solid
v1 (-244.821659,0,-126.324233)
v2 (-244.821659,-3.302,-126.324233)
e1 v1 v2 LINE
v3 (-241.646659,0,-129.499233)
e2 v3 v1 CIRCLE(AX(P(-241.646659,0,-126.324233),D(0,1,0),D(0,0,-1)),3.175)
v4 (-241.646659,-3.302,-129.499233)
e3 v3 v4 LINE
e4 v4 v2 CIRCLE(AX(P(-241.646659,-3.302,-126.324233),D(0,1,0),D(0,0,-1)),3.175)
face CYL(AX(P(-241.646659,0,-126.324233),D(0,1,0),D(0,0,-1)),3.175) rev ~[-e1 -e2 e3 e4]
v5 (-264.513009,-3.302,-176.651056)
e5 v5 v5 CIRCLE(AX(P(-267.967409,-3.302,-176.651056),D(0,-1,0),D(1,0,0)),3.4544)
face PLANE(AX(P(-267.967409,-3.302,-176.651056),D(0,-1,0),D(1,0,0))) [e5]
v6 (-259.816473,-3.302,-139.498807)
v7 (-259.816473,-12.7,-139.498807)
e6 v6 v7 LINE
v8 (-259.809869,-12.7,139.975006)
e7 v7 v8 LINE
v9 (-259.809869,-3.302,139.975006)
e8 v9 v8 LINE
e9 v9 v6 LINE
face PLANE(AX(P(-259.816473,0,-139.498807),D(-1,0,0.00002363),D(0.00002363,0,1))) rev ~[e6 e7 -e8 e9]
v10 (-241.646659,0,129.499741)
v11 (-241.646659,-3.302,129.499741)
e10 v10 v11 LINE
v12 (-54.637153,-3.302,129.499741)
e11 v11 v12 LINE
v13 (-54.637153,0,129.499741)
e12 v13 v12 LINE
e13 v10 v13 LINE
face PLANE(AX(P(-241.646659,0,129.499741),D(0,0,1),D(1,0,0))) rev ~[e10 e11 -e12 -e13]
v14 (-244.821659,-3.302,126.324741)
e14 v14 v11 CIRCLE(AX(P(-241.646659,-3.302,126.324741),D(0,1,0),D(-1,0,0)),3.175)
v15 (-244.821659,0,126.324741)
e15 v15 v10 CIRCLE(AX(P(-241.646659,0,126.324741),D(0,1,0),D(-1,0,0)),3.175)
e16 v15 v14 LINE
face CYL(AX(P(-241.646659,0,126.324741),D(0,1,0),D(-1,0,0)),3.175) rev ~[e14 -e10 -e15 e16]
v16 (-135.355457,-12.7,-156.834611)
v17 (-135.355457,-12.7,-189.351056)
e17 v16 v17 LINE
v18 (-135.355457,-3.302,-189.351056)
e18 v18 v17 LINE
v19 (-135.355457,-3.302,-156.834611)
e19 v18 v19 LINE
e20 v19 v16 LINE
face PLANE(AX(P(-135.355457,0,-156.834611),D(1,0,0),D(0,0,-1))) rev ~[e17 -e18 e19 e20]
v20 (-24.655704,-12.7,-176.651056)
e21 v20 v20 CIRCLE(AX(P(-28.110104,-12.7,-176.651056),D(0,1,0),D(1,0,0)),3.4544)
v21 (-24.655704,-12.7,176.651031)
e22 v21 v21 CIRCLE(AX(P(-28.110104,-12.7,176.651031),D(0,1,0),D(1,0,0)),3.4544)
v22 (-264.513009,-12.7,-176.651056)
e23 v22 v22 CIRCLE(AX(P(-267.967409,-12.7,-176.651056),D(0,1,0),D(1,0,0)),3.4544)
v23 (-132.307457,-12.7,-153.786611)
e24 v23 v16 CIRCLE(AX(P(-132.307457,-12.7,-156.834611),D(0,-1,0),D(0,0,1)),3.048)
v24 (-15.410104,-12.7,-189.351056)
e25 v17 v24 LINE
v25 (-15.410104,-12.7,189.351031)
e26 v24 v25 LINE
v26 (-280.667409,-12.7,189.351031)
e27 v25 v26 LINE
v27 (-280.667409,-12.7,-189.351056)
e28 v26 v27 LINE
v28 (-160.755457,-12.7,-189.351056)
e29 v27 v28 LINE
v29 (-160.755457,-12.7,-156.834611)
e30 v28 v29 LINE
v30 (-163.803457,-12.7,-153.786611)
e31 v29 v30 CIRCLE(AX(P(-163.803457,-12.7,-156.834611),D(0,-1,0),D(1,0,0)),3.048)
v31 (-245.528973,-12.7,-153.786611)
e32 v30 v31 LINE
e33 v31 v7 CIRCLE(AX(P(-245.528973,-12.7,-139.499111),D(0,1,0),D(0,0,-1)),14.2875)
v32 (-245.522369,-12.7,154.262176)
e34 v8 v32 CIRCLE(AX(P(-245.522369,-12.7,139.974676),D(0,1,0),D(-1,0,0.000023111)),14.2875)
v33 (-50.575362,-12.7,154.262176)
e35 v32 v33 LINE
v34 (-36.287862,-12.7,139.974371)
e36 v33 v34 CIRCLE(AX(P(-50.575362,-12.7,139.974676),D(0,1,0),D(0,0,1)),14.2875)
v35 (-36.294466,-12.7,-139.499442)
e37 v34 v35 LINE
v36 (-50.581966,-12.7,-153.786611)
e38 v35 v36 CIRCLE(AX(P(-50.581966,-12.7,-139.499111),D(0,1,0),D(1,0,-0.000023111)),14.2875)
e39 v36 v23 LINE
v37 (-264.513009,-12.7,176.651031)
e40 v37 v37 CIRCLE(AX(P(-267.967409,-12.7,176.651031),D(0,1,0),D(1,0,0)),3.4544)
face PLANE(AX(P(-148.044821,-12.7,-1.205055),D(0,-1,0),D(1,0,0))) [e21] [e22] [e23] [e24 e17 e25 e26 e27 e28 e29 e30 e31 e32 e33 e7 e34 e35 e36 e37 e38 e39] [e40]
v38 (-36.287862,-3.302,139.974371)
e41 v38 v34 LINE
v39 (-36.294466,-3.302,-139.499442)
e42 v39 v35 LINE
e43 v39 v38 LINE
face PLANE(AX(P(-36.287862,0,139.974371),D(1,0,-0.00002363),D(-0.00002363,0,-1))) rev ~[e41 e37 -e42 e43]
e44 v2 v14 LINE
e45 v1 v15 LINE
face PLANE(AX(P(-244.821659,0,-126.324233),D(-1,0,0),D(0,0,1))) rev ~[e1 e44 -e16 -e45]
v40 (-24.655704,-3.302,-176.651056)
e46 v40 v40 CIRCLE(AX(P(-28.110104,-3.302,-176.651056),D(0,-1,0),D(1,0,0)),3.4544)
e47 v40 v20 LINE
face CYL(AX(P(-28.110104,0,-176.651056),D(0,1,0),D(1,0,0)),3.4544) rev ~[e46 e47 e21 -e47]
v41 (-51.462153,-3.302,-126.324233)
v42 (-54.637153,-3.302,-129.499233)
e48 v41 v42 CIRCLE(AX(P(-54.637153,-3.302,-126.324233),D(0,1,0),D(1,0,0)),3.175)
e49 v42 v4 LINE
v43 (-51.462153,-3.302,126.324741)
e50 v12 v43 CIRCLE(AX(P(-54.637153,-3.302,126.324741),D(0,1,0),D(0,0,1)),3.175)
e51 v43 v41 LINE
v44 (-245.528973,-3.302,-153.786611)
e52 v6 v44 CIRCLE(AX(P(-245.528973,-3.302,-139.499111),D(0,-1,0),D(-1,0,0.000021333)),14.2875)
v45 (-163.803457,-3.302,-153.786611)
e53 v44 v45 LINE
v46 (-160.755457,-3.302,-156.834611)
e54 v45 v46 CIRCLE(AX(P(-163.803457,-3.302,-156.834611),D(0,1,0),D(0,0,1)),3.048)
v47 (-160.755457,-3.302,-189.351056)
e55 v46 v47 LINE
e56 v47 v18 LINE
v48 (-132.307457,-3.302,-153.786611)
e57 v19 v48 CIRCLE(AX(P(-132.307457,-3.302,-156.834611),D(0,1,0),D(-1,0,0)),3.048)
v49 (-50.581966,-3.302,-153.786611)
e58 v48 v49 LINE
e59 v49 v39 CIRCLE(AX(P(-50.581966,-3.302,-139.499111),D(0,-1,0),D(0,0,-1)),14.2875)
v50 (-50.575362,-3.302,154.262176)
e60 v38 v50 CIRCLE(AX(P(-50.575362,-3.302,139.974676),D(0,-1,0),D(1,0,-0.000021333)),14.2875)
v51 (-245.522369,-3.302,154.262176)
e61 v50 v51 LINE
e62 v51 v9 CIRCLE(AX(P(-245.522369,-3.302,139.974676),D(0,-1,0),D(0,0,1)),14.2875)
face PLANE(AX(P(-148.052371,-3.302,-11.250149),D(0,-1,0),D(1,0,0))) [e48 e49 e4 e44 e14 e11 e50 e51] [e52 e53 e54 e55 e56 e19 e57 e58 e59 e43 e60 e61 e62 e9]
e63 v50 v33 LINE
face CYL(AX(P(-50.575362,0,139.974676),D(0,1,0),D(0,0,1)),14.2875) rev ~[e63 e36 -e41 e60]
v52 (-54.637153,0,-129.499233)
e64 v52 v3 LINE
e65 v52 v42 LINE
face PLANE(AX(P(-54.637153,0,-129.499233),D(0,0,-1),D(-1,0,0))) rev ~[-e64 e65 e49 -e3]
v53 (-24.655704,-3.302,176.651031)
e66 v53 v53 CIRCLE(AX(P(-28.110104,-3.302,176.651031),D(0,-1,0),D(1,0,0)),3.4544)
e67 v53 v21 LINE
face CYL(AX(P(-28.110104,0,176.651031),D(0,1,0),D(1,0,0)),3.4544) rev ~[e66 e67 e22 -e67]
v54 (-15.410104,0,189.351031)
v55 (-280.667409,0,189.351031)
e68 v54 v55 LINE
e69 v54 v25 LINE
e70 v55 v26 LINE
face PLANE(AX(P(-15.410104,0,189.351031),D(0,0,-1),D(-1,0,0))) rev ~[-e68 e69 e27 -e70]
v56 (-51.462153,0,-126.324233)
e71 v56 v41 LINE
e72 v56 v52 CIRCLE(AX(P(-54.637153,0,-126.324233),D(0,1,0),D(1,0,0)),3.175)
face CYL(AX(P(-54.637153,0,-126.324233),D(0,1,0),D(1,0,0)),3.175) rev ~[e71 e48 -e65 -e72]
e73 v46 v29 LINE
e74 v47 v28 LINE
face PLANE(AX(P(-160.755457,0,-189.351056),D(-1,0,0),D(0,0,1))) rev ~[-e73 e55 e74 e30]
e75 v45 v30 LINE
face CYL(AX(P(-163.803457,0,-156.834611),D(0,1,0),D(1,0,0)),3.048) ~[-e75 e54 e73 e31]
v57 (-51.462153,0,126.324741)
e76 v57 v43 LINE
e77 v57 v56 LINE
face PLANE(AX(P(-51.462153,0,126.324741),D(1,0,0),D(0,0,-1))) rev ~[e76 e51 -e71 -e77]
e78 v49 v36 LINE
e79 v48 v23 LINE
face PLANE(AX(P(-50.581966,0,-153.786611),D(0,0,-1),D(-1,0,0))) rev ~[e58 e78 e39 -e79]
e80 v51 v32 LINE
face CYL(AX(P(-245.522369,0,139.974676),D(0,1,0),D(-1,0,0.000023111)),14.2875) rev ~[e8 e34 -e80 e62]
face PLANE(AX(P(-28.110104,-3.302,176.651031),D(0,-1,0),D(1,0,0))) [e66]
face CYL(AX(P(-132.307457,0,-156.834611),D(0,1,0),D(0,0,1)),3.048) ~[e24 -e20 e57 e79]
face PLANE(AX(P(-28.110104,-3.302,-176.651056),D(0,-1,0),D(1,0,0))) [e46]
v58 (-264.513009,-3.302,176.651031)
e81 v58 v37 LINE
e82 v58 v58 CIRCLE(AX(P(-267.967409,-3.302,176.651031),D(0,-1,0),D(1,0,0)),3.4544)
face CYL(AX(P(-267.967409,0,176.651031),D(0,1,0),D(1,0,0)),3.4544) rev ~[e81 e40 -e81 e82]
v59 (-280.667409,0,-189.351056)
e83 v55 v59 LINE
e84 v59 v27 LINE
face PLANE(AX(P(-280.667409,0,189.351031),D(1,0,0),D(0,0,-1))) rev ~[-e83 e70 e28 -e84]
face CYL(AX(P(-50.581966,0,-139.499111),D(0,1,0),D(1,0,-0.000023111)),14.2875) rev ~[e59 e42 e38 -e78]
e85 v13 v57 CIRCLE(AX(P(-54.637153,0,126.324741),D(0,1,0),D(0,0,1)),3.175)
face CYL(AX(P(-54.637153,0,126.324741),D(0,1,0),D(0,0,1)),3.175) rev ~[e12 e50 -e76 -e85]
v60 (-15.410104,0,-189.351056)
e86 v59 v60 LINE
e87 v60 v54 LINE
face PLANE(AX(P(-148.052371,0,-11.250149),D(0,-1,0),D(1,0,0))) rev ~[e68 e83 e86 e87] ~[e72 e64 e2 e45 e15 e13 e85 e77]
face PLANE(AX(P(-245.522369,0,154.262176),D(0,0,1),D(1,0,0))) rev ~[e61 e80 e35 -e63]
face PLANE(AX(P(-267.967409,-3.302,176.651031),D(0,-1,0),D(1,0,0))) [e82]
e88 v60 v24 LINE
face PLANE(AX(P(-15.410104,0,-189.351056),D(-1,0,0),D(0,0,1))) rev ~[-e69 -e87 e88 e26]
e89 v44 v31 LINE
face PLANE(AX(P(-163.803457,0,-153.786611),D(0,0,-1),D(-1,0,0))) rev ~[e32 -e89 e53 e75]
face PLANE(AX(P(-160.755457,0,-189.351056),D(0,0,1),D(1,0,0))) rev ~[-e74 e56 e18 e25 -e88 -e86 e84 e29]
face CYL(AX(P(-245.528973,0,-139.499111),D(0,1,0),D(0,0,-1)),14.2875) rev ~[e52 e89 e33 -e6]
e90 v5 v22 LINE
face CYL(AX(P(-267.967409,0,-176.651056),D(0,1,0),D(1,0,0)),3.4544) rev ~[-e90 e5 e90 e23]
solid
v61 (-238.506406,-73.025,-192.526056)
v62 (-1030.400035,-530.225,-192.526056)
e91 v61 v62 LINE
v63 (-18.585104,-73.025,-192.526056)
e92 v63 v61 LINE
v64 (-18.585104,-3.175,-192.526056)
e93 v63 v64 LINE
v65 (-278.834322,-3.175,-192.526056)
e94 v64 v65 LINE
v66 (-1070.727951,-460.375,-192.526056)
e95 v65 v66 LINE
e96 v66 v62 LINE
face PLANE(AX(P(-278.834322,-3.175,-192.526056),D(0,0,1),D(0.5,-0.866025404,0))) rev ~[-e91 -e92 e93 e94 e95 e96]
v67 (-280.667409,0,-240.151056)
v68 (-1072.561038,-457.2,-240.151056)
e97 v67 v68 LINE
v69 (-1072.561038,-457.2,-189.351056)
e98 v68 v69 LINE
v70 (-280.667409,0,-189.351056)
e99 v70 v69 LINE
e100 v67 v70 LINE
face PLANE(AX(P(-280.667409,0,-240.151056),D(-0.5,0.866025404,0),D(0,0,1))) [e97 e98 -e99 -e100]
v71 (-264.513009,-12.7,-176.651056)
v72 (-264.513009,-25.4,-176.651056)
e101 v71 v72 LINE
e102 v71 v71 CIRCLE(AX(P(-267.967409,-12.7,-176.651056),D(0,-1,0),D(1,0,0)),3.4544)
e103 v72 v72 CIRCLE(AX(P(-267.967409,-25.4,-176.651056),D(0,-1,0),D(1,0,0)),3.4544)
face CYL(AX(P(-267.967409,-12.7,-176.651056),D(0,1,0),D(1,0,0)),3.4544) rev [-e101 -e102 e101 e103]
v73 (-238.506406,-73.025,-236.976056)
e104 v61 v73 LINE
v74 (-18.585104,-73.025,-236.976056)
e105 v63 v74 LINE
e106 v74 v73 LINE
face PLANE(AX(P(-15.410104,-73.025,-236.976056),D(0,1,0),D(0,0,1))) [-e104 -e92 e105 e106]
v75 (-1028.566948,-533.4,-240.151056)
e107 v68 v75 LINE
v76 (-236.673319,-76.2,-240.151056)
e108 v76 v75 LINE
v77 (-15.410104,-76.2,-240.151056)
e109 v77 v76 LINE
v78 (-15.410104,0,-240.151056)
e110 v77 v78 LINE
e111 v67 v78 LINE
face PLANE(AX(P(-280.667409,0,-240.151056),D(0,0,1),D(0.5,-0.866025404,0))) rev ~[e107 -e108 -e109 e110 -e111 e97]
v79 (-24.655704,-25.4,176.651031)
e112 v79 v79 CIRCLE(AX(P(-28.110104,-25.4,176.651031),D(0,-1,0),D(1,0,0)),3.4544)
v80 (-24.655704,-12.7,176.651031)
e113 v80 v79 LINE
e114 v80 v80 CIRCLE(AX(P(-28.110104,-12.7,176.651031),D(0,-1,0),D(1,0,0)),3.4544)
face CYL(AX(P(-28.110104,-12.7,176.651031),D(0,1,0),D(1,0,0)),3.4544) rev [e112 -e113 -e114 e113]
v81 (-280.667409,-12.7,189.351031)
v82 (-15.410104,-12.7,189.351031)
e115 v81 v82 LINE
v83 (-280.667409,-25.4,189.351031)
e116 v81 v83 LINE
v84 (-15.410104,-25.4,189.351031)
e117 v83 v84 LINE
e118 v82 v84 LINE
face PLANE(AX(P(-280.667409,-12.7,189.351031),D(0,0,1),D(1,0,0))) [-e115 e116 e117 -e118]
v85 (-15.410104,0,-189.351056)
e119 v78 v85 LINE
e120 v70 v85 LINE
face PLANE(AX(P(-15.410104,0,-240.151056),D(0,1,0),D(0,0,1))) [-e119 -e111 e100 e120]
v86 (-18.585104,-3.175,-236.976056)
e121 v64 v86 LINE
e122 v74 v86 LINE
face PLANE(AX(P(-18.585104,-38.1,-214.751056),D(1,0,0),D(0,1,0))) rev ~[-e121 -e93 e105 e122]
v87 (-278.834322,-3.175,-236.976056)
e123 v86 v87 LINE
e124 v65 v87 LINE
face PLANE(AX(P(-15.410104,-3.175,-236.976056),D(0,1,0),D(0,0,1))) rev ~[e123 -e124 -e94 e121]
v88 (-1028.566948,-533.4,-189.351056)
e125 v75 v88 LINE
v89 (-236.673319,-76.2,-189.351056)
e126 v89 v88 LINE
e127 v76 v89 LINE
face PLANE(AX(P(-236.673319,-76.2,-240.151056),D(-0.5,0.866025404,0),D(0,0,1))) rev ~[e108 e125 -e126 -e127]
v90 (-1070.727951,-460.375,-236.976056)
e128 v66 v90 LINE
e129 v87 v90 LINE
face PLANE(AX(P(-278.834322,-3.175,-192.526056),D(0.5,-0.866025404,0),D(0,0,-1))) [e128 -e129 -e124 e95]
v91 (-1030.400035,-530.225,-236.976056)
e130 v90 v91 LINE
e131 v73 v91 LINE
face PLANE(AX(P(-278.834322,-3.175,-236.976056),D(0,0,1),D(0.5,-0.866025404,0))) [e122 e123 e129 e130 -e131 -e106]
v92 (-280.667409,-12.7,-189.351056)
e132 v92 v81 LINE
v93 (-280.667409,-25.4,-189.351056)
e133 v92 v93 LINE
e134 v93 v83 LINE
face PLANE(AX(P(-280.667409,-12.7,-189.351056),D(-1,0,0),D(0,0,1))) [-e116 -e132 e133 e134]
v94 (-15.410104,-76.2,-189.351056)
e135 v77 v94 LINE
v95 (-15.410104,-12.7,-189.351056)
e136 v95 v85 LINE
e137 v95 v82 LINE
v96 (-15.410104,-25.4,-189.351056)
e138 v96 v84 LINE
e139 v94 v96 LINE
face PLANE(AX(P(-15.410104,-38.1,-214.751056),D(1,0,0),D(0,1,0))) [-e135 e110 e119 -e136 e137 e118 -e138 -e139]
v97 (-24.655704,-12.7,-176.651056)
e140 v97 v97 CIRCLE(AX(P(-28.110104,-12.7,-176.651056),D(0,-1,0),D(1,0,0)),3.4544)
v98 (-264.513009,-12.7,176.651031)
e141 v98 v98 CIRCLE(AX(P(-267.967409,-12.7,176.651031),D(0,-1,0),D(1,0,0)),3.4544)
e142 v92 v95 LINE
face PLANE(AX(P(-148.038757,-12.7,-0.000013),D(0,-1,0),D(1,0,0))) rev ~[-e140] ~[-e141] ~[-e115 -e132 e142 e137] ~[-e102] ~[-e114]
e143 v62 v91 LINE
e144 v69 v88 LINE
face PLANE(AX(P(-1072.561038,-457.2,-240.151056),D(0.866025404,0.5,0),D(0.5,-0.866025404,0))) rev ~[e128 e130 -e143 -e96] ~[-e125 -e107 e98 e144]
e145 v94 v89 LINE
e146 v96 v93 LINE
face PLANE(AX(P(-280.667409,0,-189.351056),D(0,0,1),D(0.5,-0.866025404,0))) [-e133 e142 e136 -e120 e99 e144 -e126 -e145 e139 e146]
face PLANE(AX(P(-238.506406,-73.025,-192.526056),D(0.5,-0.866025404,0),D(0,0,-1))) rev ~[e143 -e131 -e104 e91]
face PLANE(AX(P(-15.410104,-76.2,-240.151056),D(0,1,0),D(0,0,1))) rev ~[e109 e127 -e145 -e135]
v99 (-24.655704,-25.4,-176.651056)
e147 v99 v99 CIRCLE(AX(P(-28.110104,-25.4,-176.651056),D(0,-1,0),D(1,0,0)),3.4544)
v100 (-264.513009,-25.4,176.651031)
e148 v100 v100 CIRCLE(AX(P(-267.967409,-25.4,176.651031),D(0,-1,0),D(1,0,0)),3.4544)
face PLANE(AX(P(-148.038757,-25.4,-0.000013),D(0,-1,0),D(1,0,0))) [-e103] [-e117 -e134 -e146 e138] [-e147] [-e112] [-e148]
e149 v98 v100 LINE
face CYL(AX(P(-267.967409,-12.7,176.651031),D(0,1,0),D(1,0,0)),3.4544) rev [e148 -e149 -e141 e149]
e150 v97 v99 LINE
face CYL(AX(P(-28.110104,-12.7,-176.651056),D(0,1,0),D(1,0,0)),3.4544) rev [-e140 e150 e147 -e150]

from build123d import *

# Parameters (mm, degrees)
F0_W      = 265.2573054
F0_H      = 378.7020874
F1_DEPTH  = 12.7
F2_DEPTH  = 3.302
F3_W      = 76.2
F3_H      = 50.8
F3_W_2    = 69.85
F3_H_2    = 44.45
F4_DEPTH  = 265.2573054
F6_DEPTH  = 50.8
F7_DEPTH  = 914.4
F8_W      = 265.2573054
F8_H      = 378.7020874
F8_R      = 3.4544
F9_DEPTH  = 12.7
F11_W     = 76.2
F11_H     = 50.8
F12_DEPTH = 3.175


with BuildPart() as f1:
    # F0 (on Front) → F1 (new body)
    with BuildSketch(Plane.XZ):
        with Locations((148.0387565, -1.27e-05)):
            Rectangle(F0_W, F0_H)
        with BuildLine():
            ThreePointArc((24.6557038, -176.6510564), (28.1101038, -173.1966564), (31.5645038, -176.6510564))
            ThreePointArc((31.5645038, -176.6510564), (28.1101038, -180.1054564), (24.6557038, -176.6510564))
        make_face(mode=Mode.SUBTRACT)
        with BuildLine():
            ThreePointArc((264.5130092, -176.6510564), (267.9674092, -173.1966564), (271.4218092, -176.6510564))
            ThreePointArc((271.4218092, -176.6510564), (267.9674092, -180.1054564), (264.5130092, -176.6510564))
        make_face(mode=Mode.SUBTRACT)
        with BuildLine():
            ThreePointArc((24.6557038, 176.651031), (28.1101038, 180.105431), (31.5645038, 176.651031))
            ThreePointArc((31.5645038, 176.651031), (28.1101038, 173.196631), (24.6557038, 176.651031))
        make_face(mode=Mode.SUBTRACT)
        with BuildLine():
            ThreePointArc((264.5130092, 176.651031), (267.9674092, 180.105431), (271.4218092, 176.651031))
            ThreePointArc((271.4218092, 176.651031), (267.9674092, 173.196631), (264.5130092, 176.651031))
        make_face(mode=Mode.SUBTRACT)
    extrude(amount=F1_DEPTH)


with BuildPart() as f1b:
    # F0 (on Front) → F1, piece 2 (new body)
    with BuildSketch(Plane.XZ):
        with BuildLine():
            Line((-259.816473, -139.4988066), (-259.809869, 139.9750058))
            ThreePointArc((-259.8098689962, 139.9750058), (-255.6250403922, 150.0775804789), (-245.522369, 154.2621756))
            Line((-245.522369, 154.2621756), (-50.5753624, 154.2621756))
            ThreePointArc((-50.5753624, 154.2621756), (-40.4724665013, 150.0773559726), (-36.2878624033, 139.9743708))
            Line((-36.2878624, 139.9743708), (-36.2944664, -139.4994416))
            ThreePointArc((-36.2944664038, -139.4994416), (-40.4792950078, -149.6020162789), (-50.5819664, -153.7866114))
            Line((-50.5819664, -153.7866114), (-132.307457, -153.7866114))
            ThreePointArc((-132.307457, -153.7866114), (-134.4627184691, -154.6793499309), (-135.355457, -156.8346114))
            Line((-135.355457, -156.8346114), (-135.355457, -171.7670174))
            Line((-135.355457, -171.7670174), (-135.355457, -187.919233))
            Line((-135.355457, -187.919233), (-135.355457, -189.3510564))
            Line((-135.355457, -189.3510564), (-15.4101038, -189.3510564))
            Line((-15.4101038, -189.3510564), (-15.4101038, 189.351031))
            Line((-15.4101038, 189.351031), (-280.6674092, 189.351031))
            Line((-280.6674092, 189.351031), (-280.6674092, -189.3510564))
            Line((-280.6674092, -189.3510564), (-160.755457, -189.3510564))
            Line((-160.755457, -189.3510564), (-160.755457, -187.919233))
            Line((-160.755457, -187.919233), (-160.755457, -171.7670174))
            Line((-160.755457, -171.7670174), (-160.755457, -156.8346114))
            ThreePointArc((-160.755457, -156.8346114), (-161.6481955309, -154.6793499309), (-163.803457, -153.7866114))
            Line((-163.803457, -153.7866114), (-245.528973, -153.7866114))
            ThreePointArc((-245.528973, -153.7866114), (-255.6318688987, -149.6017917726), (-259.8164729967, -139.4988066))
        make_face()
        with BuildLine():
            ThreePointArc((-271.4218092, -176.6510564), (-267.9674092, -173.1966564), (-264.5130092, -176.6510564))
            ThreePointArc((-264.5130092, -176.6510564), (-267.9674092, -180.1054564), (-271.4218092, -176.6510564))
        make_face(mode=Mode.SUBTRACT)
        with BuildLine():
            ThreePointArc((-31.5645038, -176.6510564), (-28.1101038, -173.1966564), (-24.6557038, -176.6510564))
            ThreePointArc((-24.6557038, -176.6510564), (-28.1101038, -180.1054564), (-31.5645038, -176.6510564))
        make_face(mode=Mode.SUBTRACT)
        with BuildLine():
            ThreePointArc((-271.4218092, 176.651031), (-267.9674092, 180.105431), (-264.5130092, 176.651031))
            ThreePointArc((-264.5130092, 176.651031), (-267.9674092, 173.196631), (-271.4218092, 176.651031))
        make_face(mode=Mode.SUBTRACT)
        with BuildLine():
            ThreePointArc((-31.5645038, 176.651031), (-28.1101038, 180.105431), (-24.6557038, 176.651031))
            ThreePointArc((-24.6557038, 176.651031), (-28.1101038, 173.196631), (-31.5645038, 176.651031))
        make_face(mode=Mode.SUBTRACT)
    extrude(amount=F1_DEPTH)

    # F0 (on Front) → F2 (join)
    with BuildSketch(Plane.XZ):
        with BuildLine():
            ThreePointArc((-245.522369, 154.2621756), (-255.6250403922, 150.0775804789), (-259.8098689962, 139.9750058))
            Line((-259.809869, 139.9750058), (-259.816473, -139.4988066))
            ThreePointArc((-259.8164729967, -139.4988066), (-255.6318688987, -149.6017917726), (-245.528973, -153.7866114))
            Line((-245.528973, -153.7866114), (-163.803457, -153.7866114))
            ThreePointArc((-163.803457, -153.7866114), (-161.6481955309, -154.6793499309), (-160.755457, -156.8346114))
            Line((-160.755457, -156.8346114), (-160.755457, -171.7670174))
            Line((-160.755457, -171.7670174), (-160.755457, -187.919233))
            Line((-160.755457, -187.919233), (-160.755457, -189.3510564))
            Line((-160.755457, -189.3510564), (-135.355457, -189.3510564))
            Line((-135.355457, -189.3510564), (-135.355457, -187.919233))
            Line((-135.355457, -187.919233), (-135.355457, -171.7670174))
            Line((-135.355457, -171.7670174), (-135.355457, -156.8346114))
            ThreePointArc((-135.355457, -156.8346114), (-134.4627184691, -154.6793499309), (-132.307457, -153.7866114))
            Line((-132.307457, -153.7866114), (-50.5819664, -153.7866114))
            ThreePointArc((-50.5819664, -153.7866114), (-40.4792950078, -149.6020162789), (-36.2944664038, -139.4994416))
            Line((-36.2944664, -139.4994416), (-36.2878624, 139.9743708))
            ThreePointArc((-36.2878624033, 139.9743708), (-40.4724665013, 150.0773559726), (-50.5753624, 154.2621756))
            Line((-50.5753624, 154.2621756), (-245.522369, 154.2621756))
        make_face()
        with BuildLine():
            ThreePointArc((-241.6466592, -129.499233), (-243.8917232303, -128.5692970303), (-244.8216592, -126.324233))
            Line((-244.8216592, -126.324233), (-244.8216592, 126.324741))
            ThreePointArc((-244.8216592, 126.324741), (-243.8917232303, 128.5698050303), (-241.6466592, 129.499741))
            Line((-241.6466592, 129.499741), (-54.6371526, 129.499741))
            ThreePointArc((-54.6371526, 129.499741), (-52.3920885697, 128.5698050303), (-51.4621526, 126.324741))
            Line((-51.4621526, 126.324741), (-51.4621526, -126.324233))
            ThreePointArc((-51.4621526, -126.324233), (-52.3920885697, -128.5692970303), (-54.6371526, -129.499233))
            Line((-54.6371526, -129.499233), (-241.6466592, -129.499233))
        make_face(mode=Mode.SUBTRACT)
        with BuildLine():
            ThreePointArc((-31.5645038, 176.651031), (-28.1101038, 173.196631), (-24.6557038, 176.651031))
            ThreePointArc((-24.6557038, 176.651031), (-28.1101038, 180.105431), (-31.5645038, 176.651031))
        make_face()
        with BuildLine():
            ThreePointArc((-31.5645038, -176.6510564), (-28.1101038, -180.1054564), (-24.6557038, -176.6510564))
            ThreePointArc((-24.6557038, -176.6510564), (-28.1101038, -173.1966564), (-31.5645038, -176.6510564))
        make_face()
        with BuildLine():
            ThreePointArc((-271.4218092, -176.6510564), (-267.9674092, -180.1054564), (-264.5130092, -176.6510564))
            ThreePointArc((-264.5130092, -176.6510564), (-267.9674092, -173.1966564), (-271.4218092, -176.6510564))
        make_face()
        with BuildLine():
            ThreePointArc((-271.4218092, 176.651031), (-267.9674092, 173.196631), (-264.5130092, 176.651031))
            ThreePointArc((-264.5130092, 176.651031), (-267.9674092, 180.105431), (-271.4218092, 176.651031))
        make_face()
    extrude(amount=F2_DEPTH)


with BuildPart() as f4:
    # F3 (on face) → F4 (new body, through all)
    with BuildSketch(Plane.YZ.offset(-15.4101038)):
        with Locations((-38.1, -214.7510564)):
            Rectangle(F3_W, F3_H)
        with Locations((-38.1, -214.7510564)):
            Rectangle(F3_W_2, F3_H_2, mode=Mode.SUBTRACT)
    extrude(amount=-F4_DEPTH)

    # F5 (on face) → F6 (cut)
    with BuildSketch(Plane(origin=(0, 0, -240.1510564), x_dir=(1, 0, 0), z_dir=(0, 0, -1))):
        Polygon((-280.6674092001, 76.2), (-280.6674092001, 0), (-236.6733186879, 76.2), align=None)
    extrude(amount=-F6_DEPTH, mode=Mode.SUBTRACT)

    # F7 (add): a face of the model
    f7_faces = [f4.faces().sort_by_distance(p)[0] for p in [
        (-258.670363944, -38.1, -239.1350564),
    ]]
    extrude(f7_faces, amount=F7_DEPTH)

    # F8 (on face) → F9 (join)
    with BuildSketch(Plane.XZ.offset(12.7)):
        with Locations((-148.0387565, -1.27e-05)):
            Rectangle(F8_W, F8_H)
        with Locations((-267.9674092, -176.6510564)):
            Circle(F8_R, mode=Mode.SUBTRACT)
        with Locations((-28.1101038, -176.6510564)):
            Circle(F8_R, mode=Mode.SUBTRACT)
        with Locations((-267.9674092, 176.651031)):
            Circle(F8_R, mode=Mode.SUBTRACT)
        with Locations((-28.1101038, 176.651031)):
            Circle(F8_R, mode=Mode.SUBTRACT)
    extrude(amount=F9_DEPTH)

    # F10: union 

    # F11 (on face) → F12 (join)
    with BuildSketch(Plane.YZ.offset(-15.4101038)):
        with Locations((-38.1, -214.7510564)):
            Rectangle(F11_W, F11_H)
    extrude(amount=-F12_DEPTH)


solid = Compound([f1b.part, f4.part])
